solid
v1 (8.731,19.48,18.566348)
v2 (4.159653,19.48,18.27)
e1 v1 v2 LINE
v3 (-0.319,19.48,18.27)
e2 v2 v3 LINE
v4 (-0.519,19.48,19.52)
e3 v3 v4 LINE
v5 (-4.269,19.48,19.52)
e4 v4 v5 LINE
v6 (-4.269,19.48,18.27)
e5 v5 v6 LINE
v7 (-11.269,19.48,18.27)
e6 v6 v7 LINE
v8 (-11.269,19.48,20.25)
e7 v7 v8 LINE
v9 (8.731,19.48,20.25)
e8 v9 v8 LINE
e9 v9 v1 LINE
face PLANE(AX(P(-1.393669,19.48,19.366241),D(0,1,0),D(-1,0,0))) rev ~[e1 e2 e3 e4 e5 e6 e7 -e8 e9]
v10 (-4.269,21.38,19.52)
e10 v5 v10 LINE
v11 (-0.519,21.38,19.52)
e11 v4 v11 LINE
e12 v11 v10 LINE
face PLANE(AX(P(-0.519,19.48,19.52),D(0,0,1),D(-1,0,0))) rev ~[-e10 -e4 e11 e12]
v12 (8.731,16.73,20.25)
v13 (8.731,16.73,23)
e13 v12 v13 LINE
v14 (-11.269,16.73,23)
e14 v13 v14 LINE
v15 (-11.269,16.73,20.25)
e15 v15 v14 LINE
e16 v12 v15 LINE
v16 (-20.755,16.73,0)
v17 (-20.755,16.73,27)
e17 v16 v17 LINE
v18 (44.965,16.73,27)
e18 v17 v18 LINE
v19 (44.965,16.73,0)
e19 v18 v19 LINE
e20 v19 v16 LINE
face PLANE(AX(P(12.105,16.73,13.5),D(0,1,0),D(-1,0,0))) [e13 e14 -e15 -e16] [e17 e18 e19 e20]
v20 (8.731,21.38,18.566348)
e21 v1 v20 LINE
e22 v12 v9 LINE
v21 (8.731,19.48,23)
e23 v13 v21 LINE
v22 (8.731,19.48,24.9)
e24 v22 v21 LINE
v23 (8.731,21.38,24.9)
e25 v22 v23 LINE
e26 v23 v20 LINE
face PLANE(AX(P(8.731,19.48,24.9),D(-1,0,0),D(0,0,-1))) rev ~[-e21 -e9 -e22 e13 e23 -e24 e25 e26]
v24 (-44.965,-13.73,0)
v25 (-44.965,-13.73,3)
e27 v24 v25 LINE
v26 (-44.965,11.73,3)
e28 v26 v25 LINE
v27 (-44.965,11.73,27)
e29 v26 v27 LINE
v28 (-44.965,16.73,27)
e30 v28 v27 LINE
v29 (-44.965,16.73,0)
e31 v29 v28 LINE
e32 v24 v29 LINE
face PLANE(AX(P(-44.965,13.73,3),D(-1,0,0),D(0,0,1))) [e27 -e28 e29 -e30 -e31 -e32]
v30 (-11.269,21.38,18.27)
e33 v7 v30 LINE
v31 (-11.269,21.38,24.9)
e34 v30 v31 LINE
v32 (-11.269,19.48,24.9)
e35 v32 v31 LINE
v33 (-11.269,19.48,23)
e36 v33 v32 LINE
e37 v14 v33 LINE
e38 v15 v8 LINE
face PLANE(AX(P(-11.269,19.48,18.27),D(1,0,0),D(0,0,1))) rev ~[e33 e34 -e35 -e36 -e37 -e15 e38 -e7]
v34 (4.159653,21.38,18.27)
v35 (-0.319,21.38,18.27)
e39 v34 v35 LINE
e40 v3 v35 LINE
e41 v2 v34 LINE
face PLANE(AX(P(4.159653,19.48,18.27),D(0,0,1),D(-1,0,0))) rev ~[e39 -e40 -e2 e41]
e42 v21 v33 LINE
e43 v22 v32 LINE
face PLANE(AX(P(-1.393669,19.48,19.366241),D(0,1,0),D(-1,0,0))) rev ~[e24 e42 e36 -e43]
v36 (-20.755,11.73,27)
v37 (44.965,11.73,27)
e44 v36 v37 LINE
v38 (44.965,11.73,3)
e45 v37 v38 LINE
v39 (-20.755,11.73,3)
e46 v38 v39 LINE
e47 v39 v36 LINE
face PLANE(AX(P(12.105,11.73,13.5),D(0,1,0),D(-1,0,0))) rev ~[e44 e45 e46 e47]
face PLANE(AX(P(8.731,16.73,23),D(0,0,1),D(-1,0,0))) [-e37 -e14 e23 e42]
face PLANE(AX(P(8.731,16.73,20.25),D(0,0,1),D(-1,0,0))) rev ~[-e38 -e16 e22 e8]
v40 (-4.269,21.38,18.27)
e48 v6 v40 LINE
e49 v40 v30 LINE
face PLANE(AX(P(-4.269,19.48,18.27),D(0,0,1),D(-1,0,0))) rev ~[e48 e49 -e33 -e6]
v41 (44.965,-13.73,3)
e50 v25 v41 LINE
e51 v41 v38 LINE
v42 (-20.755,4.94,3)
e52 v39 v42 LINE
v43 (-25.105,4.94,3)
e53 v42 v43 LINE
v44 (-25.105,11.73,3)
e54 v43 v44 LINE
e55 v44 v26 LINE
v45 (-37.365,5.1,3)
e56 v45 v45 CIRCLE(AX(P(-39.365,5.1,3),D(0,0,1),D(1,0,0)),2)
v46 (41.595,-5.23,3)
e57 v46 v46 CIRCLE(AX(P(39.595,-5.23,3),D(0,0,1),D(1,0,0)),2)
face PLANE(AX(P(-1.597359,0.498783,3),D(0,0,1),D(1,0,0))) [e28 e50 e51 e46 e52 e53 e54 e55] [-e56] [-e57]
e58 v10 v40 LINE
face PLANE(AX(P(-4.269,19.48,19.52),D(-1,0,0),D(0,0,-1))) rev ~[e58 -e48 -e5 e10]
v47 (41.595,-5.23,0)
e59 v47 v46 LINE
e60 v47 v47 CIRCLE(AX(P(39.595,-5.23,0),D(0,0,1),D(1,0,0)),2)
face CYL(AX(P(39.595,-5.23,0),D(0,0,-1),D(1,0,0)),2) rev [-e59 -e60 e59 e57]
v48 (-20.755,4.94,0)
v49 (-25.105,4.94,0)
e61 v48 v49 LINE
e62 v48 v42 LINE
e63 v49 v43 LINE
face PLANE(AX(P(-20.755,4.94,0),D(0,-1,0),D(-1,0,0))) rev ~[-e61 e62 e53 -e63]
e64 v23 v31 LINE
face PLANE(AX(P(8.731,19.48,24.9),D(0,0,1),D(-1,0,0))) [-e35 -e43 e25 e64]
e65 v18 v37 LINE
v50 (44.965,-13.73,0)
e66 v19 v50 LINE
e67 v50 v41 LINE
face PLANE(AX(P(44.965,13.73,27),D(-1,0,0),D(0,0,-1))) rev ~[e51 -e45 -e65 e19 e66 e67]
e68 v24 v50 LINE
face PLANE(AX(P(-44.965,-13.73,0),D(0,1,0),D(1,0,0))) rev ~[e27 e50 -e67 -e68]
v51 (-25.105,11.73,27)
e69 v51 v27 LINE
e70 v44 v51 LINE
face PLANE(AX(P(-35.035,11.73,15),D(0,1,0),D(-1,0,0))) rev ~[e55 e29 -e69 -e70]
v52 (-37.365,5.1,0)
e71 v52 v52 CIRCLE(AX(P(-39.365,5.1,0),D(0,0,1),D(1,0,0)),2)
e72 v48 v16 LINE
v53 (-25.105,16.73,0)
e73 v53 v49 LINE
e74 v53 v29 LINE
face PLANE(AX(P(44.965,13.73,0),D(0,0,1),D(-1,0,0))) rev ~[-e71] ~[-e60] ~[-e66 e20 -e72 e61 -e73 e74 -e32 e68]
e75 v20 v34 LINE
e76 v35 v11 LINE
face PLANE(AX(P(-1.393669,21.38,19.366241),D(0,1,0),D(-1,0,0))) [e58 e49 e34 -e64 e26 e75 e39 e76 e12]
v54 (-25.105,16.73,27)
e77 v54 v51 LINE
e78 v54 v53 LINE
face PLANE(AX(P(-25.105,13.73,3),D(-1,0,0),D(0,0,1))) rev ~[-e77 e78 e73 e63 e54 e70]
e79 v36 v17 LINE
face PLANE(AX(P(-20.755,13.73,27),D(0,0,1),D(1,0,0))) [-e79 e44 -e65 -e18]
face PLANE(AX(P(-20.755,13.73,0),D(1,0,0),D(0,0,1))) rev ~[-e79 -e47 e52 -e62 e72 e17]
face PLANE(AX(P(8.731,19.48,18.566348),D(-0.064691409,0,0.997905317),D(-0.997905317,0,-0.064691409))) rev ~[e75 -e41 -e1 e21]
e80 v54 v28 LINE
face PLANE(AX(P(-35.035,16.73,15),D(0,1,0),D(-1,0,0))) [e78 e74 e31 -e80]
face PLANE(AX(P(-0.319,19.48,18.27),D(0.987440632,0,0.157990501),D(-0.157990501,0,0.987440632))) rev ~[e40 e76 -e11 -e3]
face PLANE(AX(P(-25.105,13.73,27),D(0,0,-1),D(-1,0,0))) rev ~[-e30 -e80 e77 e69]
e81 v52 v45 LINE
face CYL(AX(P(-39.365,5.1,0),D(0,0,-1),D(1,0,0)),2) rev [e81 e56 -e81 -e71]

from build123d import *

# Parameters (mm, degrees)
F0_R     = 2
F1_DEPTH = 3
F2_W     = 19.86
F2_H     = 24
F2_H_2   = 3
F3_DEPTH = 3
F4_W     = 20
F4_H     = 2.75
F5_DEPTH = 2.75
F6_W     = 20
F6_H     = 1.9
F7_DEPTH = 1.9
F8_DEPTH = 2


with BuildPart() as f1:
    # F0 (on Top) → F1 (new body)
    with BuildSketch(Plane.XY):
        Polygon((-44.965, -13.73), (44.965, -13.73), (44.965, 13.73), (-20.755, 13.73), (-20.755, 4.94), (-25.105, 4.94), (-25.105, 13.73), (-44.965, 13.73), align=None)
        with Locations((39.595, -5.23)):
            Circle(F0_R, mode=Mode.SUBTRACT)
        with Locations((-39.365, 5.1)):
            Circle(F0_R, mode=Mode.SUBTRACT)
    extrude(amount=F1_DEPTH)

    # F2 (on face) → F3 (join)
    with BuildSketch(Plane(origin=(0, 13.73, 0), x_dir=(-1, 0, 0), z_dir=(0, 1, 0))):
        Polygon((11.269, 0), (20.755, 0), (20.755, 3), (20.755, 27), (-44.965, 27), (-44.965, 3), (-44.965, 0), (-8.731, 0), align=None)
        with Locations((35.035, 15)):
            Rectangle(F2_W, F2_H)
        with Locations((35.035, 1.5)):
            Rectangle(F2_W, F2_H_2)
    extrude(amount=F3_DEPTH)

    # F4 (on face) → F5 (join)
    with BuildSketch(Plane(origin=(0, 16.73, 0), x_dir=(-1, 0, 0), z_dir=(0, 1, 0))):
        with Locations((1.269, 21.625)):
            Rectangle(F4_W, F4_H)
    extrude(amount=F5_DEPTH)

    # F6 (on face) → F7 (join)
    with BuildSketch(Plane(origin=(0, 19.48, 0), x_dir=(-1, 0, 0), z_dir=(0, 1, 0))):
        Polygon((11.269, 20.25), (-8.731, 20.25), (-8.731, 18.5663476586), (-4.159652628, 18.27), (0.319, 18.27), (0.519, 19.52), (4.269, 19.52), (4.269, 18.27), (11.269, 18.27), align=None)
        Polygon((-8.731, 23), (-8.731, 20.25), (11.269, 20.25), (11.269, 21.625), (11.269, 23), align=None)
        with Locations((1.269, 23.95)):
            Rectangle(F6_W, F6_H)
    extrude(amount=F7_DEPTH)

    # F2 (on face) → F8 (join)
    with BuildSketch(Plane(origin=(0, 13.73, 0), x_dir=(-1, 0, 0), z_dir=(0, 1, 0))):
        with Locations((35.035, 15)):
            Rectangle(F2_W, F2_H)
        Polygon((11.269, 0), (20.755, 0), (20.755, 3), (20.755, 27), (-44.965, 27), (-44.965, 3), (-44.965, 0), (-8.731, 0), align=None)
    extrude(amount=-F8_DEPTH)


solid = f1.part
